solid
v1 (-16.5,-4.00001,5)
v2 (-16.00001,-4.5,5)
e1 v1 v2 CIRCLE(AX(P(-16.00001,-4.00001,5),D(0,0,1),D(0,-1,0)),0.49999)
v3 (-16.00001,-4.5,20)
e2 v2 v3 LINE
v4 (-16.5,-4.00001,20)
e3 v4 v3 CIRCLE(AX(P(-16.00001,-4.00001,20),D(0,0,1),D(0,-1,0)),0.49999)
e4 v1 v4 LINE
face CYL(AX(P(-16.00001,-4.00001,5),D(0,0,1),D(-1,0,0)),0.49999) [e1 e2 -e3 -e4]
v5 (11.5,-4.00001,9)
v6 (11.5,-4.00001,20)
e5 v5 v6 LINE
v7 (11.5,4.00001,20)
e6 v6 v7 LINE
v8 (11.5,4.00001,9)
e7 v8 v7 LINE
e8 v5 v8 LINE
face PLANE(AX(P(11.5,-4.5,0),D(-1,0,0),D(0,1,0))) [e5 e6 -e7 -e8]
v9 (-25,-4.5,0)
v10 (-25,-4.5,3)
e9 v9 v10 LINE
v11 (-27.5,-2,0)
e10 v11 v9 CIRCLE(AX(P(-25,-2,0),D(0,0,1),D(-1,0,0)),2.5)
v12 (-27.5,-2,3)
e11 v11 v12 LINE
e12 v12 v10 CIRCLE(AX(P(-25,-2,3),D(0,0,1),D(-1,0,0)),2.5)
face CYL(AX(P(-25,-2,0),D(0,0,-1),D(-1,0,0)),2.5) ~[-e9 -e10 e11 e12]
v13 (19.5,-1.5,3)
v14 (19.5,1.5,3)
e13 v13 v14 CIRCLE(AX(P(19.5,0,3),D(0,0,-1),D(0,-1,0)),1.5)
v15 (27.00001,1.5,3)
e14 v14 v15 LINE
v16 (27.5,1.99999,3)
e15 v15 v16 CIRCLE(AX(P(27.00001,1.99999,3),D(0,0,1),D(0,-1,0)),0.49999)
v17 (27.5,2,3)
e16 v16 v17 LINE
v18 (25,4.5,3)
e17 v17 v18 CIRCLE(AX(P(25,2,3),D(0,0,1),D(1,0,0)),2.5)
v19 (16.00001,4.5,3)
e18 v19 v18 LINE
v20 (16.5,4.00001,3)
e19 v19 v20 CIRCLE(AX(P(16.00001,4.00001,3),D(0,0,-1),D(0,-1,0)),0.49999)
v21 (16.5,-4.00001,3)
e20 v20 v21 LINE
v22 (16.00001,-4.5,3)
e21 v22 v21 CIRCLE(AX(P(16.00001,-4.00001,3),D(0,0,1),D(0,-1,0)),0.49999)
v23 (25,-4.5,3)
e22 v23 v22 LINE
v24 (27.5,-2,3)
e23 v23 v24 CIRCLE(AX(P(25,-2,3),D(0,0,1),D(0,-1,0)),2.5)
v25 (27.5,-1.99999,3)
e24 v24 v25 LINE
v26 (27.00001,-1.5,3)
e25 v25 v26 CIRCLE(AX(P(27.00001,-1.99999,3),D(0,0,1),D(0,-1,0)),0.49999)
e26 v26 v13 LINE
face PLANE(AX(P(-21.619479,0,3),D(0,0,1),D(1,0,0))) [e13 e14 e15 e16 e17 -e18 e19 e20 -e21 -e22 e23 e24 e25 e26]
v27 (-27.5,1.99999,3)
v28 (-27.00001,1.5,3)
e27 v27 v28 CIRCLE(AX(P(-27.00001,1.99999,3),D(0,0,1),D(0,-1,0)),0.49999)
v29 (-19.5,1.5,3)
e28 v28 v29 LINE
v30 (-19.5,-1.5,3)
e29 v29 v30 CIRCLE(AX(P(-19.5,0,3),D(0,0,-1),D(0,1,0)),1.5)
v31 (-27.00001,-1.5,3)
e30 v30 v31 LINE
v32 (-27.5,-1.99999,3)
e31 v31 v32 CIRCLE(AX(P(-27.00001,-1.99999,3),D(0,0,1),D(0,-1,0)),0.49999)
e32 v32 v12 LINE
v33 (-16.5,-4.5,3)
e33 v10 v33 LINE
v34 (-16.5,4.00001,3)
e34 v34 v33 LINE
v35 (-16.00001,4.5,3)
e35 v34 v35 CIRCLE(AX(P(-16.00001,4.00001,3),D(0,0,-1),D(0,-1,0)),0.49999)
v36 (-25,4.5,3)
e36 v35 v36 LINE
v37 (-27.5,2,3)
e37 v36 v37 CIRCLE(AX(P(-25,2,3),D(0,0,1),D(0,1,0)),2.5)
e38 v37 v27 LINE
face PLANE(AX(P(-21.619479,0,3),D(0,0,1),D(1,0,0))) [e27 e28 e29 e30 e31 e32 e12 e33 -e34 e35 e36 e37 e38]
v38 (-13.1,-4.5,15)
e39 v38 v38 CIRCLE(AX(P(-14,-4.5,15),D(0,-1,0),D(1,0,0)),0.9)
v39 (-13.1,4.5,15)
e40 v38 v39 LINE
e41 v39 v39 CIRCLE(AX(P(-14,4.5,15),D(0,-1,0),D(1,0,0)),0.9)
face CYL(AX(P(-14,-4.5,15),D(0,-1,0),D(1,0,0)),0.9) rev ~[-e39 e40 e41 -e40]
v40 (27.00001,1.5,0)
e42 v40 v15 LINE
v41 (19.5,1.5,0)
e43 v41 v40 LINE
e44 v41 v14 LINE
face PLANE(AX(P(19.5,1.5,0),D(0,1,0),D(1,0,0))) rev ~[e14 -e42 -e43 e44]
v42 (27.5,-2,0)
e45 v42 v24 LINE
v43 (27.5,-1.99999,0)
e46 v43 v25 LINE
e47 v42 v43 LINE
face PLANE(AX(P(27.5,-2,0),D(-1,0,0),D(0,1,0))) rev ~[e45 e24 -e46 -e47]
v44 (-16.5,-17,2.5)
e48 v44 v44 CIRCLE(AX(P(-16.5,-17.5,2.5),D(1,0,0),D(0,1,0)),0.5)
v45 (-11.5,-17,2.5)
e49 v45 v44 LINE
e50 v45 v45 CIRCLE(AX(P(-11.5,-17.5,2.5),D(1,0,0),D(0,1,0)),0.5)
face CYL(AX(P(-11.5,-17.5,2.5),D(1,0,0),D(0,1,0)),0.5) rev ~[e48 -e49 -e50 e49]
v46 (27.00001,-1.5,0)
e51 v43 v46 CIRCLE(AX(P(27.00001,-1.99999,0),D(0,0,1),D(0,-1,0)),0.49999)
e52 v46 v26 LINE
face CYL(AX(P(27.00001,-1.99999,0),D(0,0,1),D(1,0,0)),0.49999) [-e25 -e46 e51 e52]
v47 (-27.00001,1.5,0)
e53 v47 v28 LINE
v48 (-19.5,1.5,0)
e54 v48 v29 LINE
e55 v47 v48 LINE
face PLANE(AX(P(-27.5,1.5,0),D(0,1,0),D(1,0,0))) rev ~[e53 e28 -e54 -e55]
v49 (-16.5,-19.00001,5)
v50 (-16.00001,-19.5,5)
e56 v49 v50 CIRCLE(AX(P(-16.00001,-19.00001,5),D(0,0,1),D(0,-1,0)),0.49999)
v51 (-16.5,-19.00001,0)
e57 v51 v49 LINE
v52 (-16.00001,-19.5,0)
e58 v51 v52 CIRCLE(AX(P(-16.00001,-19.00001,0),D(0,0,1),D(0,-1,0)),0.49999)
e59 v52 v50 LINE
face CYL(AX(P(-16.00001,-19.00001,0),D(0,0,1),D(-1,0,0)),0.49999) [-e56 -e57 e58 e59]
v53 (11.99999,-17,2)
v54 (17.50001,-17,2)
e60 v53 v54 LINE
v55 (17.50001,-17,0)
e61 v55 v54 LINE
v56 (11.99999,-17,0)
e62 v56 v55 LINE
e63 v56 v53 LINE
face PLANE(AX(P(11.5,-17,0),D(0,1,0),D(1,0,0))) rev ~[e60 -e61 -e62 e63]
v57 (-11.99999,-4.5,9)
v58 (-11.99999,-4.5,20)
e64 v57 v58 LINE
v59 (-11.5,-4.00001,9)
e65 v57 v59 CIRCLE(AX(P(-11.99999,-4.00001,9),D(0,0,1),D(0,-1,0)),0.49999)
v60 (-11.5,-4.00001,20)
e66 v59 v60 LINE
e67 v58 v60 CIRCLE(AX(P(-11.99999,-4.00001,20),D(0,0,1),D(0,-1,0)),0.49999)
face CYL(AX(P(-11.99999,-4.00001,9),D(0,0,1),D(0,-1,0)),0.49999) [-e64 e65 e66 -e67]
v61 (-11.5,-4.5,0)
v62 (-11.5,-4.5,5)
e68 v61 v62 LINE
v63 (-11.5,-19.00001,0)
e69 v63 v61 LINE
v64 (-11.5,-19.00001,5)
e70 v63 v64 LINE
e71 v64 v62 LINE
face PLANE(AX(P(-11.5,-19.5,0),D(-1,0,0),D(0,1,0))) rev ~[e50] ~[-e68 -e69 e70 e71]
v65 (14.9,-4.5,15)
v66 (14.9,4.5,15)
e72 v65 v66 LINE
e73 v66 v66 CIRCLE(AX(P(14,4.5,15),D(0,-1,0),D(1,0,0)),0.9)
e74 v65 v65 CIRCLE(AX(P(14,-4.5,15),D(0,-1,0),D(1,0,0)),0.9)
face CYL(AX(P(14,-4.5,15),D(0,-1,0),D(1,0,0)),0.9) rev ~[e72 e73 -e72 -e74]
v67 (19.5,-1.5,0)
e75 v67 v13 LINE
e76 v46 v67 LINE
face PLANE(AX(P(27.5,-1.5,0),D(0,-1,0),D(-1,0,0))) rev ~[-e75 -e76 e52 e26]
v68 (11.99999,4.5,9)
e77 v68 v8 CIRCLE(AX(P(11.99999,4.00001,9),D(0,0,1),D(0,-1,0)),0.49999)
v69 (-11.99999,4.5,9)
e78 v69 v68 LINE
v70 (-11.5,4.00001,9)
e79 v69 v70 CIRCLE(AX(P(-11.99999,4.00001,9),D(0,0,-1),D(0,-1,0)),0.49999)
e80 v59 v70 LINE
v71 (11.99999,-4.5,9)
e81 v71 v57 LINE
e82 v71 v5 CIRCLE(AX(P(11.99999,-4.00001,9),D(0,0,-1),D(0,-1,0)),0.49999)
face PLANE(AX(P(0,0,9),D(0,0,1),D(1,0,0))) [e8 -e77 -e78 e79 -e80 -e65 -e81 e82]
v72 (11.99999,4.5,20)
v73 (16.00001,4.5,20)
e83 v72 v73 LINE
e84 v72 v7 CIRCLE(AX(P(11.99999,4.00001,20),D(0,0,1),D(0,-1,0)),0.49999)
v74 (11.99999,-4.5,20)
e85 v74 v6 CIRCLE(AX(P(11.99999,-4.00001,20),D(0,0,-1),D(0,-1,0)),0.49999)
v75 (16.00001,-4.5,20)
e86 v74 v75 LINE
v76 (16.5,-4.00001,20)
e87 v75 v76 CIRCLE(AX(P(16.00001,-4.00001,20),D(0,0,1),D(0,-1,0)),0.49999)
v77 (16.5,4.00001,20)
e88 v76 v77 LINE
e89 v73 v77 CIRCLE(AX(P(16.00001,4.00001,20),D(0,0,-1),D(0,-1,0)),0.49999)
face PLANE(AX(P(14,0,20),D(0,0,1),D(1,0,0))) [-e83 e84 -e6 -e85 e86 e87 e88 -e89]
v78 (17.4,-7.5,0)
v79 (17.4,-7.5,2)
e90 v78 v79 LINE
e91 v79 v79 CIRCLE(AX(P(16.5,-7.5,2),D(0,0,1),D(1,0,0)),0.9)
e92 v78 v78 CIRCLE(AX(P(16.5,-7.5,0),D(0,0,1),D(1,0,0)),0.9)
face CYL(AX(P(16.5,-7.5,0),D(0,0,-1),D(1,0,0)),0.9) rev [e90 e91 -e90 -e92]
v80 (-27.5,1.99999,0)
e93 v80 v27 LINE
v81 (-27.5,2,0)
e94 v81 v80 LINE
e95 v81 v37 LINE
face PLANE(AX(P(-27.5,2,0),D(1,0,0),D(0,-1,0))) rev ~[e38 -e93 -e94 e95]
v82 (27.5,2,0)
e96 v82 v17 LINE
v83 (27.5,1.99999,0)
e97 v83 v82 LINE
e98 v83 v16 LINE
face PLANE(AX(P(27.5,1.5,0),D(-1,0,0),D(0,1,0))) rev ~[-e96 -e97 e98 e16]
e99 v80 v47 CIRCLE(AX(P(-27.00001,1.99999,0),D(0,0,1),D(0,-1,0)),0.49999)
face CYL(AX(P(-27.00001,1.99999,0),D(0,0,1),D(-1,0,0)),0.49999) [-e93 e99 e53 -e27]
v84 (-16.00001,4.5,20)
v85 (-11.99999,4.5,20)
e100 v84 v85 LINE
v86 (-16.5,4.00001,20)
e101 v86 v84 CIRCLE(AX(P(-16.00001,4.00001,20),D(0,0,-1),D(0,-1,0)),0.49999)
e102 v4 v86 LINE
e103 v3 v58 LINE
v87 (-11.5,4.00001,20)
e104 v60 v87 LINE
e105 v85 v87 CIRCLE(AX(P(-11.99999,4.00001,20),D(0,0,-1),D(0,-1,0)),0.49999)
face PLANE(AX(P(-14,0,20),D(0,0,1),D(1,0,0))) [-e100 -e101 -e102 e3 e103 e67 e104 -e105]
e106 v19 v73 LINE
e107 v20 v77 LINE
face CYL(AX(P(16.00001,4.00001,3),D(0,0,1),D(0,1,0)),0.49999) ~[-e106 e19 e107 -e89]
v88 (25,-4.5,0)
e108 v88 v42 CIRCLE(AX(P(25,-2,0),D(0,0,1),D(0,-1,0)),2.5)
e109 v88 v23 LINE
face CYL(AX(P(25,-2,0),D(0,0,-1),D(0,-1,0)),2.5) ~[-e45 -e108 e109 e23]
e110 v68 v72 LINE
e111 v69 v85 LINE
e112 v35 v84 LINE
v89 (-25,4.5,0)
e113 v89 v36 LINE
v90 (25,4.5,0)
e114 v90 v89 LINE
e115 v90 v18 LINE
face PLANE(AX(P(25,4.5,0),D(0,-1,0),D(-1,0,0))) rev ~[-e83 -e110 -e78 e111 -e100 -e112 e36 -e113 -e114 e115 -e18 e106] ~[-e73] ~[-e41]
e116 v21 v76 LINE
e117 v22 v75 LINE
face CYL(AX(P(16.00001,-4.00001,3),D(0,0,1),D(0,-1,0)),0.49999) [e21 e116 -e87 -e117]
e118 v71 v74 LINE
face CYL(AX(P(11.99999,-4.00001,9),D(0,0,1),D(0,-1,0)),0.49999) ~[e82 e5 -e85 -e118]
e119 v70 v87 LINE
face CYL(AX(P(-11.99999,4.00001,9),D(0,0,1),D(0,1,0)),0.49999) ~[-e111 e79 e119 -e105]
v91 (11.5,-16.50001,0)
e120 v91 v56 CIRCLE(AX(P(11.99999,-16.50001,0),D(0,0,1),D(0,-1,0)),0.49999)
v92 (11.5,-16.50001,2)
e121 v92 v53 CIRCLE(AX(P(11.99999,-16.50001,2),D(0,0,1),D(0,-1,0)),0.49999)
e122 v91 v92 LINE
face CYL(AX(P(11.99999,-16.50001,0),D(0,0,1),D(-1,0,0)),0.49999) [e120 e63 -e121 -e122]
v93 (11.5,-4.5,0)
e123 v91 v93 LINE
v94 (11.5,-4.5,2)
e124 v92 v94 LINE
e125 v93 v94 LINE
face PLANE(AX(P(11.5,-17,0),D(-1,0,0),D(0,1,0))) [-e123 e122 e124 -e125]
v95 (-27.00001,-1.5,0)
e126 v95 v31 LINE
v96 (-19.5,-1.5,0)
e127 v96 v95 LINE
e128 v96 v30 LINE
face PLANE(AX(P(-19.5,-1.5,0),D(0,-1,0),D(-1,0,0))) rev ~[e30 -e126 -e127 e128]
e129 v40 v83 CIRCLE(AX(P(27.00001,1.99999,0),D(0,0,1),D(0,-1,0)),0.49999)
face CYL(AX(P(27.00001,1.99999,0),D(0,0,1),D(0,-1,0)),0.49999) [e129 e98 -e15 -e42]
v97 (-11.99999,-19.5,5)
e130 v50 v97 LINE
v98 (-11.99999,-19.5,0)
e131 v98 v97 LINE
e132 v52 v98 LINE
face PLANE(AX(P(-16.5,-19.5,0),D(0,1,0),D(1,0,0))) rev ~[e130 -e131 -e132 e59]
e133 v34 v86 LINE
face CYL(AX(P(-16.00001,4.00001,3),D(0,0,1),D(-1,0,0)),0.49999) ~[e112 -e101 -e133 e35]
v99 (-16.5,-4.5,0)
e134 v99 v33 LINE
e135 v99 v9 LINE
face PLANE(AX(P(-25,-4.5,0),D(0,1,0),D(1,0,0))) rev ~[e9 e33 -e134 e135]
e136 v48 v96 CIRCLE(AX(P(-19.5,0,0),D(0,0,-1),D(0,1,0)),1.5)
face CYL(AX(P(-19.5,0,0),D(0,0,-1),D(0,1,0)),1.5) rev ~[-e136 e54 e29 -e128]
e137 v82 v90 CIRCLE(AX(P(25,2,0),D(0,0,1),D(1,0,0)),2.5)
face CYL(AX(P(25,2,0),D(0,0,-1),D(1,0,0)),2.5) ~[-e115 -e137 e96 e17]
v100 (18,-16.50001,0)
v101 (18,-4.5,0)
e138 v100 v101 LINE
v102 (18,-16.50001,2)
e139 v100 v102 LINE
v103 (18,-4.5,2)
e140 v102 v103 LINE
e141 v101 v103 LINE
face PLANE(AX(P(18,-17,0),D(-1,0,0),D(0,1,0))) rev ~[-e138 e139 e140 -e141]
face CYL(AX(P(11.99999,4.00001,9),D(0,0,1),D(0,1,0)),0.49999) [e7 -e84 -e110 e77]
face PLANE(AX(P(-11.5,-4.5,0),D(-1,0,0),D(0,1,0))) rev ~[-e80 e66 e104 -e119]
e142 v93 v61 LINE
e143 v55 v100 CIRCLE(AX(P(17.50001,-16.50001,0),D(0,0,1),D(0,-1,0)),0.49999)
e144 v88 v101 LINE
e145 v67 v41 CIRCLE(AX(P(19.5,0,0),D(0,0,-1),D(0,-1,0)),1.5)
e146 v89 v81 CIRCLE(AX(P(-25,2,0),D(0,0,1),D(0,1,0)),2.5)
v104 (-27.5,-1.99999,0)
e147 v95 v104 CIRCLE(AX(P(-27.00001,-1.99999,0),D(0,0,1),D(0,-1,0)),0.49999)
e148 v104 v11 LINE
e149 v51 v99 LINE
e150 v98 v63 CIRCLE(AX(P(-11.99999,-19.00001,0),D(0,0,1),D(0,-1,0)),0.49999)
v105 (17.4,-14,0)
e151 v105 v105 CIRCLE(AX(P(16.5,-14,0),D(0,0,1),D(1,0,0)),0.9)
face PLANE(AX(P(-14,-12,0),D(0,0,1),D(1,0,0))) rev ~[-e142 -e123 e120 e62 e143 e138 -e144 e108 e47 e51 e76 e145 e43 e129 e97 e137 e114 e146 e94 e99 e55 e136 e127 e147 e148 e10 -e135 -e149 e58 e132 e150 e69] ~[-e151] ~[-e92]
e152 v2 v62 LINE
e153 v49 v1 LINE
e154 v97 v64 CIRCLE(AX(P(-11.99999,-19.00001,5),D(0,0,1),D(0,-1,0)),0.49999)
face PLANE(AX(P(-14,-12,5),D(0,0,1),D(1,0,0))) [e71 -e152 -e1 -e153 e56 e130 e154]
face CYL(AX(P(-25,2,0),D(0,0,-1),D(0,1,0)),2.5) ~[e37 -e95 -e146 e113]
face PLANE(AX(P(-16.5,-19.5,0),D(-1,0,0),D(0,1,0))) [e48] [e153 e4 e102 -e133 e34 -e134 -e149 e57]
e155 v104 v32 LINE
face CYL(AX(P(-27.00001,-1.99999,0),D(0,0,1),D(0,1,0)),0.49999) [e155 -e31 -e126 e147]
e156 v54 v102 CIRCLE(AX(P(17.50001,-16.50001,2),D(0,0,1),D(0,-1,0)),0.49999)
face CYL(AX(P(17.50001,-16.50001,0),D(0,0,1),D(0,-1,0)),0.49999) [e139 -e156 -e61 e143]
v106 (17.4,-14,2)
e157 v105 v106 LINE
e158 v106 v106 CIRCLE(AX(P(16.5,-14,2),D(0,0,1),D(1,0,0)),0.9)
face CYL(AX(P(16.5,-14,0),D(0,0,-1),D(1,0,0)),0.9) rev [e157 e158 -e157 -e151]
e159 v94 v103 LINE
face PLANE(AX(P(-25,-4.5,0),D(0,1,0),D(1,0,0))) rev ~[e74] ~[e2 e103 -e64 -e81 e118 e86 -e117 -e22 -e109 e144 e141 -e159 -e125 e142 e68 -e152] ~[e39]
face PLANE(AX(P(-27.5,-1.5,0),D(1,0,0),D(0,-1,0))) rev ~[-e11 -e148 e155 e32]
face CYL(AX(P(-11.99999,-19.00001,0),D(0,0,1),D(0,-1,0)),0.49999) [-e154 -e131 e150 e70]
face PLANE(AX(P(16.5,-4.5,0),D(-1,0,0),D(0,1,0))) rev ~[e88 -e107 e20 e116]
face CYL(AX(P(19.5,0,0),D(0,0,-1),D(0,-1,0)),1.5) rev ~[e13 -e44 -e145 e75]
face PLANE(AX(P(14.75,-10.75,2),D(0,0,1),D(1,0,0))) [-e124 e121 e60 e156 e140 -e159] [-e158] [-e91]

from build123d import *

# Parameters (mm, degrees)
F0_W      = 5
F0_H      = 9
F0_W_2    = 23
F1_DEPTH  = 3
F2_DEPTH  = 20
F3_DEPTH  = 9
F0_H_2    = 15
F4_DEPTH  = 5
F5_R      = 0.5
F6_DEPTH  = 25
F7_W      = 6.5
F7_H      = 12.5
F7_R      = 0.9
F8_DEPTH  = 2
F9_R      = 0.9
F10_DEPTH = 25
F11_R     = 0.49999


# Not quite as in the source:
# - a fillet or chamfer is up to 0.001 mm smaller than in the source, because OpenCascade refuses the exact size


with BuildPart() as f1:
    # F0 (on Top) → F1 (new body)
    with BuildSketch(Plane.XY):
        with BuildLine():
            Line((-16.5, 4.5), (-25, 4.5))
            ThreePointArc((-25, 4.5), (-26.767766953, 3.767766953), (-27.5, 2))
            Line((-27.5, 2), (-27.5, 1.5))
            Line((-27.5, 1.5), (-19.5, 1.5))
            ThreePointArc((-19.5, 1.5), (-18, 0), (-19.5, -1.5))
            Line((-19.5, -1.5), (-27.5, -1.5))
            Line((-27.5, -1.5), (-27.5, -2))
            ThreePointArc((-27.5, -2), (-26.767766953, -3.767766953), (-25, -4.5))
            Line((-25, -4.5), (-16.5, -4.5))
            Line((-16.5, -4.5), (-16.5, 4.5))
        make_face()
        with BuildLine():
            Line((25, 4.5), (16.5, 4.5))
            Line((16.5, 4.5), (16.5, -4.5))
            Line((16.5, -4.5), (25, -4.5))
            ThreePointArc((25, -4.5), (26.767766953, -3.767766953), (27.5, -2))
            Line((27.5, -2), (27.5, -1.5))
            Line((27.5, -1.5), (19.5, -1.5))
            ThreePointArc((19.5, -1.5), (18, 0), (19.5, 1.5))
            Line((19.5, 1.5), (27.5, 1.5))
            Line((27.5, 1.5), (27.5, 2))
            ThreePointArc((27.5, 2), (26.767766953, 3.767766953), (25, 4.5))
        make_face()
        with Locations((-14, 0)):
            Rectangle(F0_W, F0_H)
        with Locations((14, 0)):
            Rectangle(F0_W, F0_H)
        Rectangle(F0_W_2, F0_H)
    extrude(amount=F1_DEPTH)

    # F0 (on Top) → F2 (join)
    with BuildSketch(Plane.XY):
        with Locations((14, 0)):
            Rectangle(F0_W, F0_H)
        with Locations((-14, 0)):
            Rectangle(F0_W, F0_H)
    extrude(amount=F2_DEPTH)

    # F0 (on Top) → F3 (join)
    with BuildSketch(Plane.XY):
        Rectangle(F0_W_2, F0_H)
    extrude(amount=F3_DEPTH)

    # F0 (on Top) → F4 (join)
    with BuildSketch(Plane.XY):
        with Locations((-14, -12)):
            Rectangle(F0_W, F0_H_2)
    extrude(amount=F4_DEPTH)

    # F5 (on face) → F6 (cut)
    with BuildSketch(Plane.YZ.offset(-11.5)):
        with Locations((-17.5, 2.5)):
            Circle(F5_R)
    extrude(amount=-F6_DEPTH, mode=Mode.SUBTRACT)

    # F7 (on Top) → F8 (join)
    with BuildSketch(Plane.XY):
        with Locations((14.75, -10.75)):
            Rectangle(F7_W, F7_H)
        with Locations((16.5, -14)):
            Circle(F7_R, mode=Mode.SUBTRACT)
        with Locations((16.5, -7.5)):
            Circle(F7_R, mode=Mode.SUBTRACT)
    extrude(amount=F8_DEPTH)

    # F9 (on face) → F10 (cut)
    with BuildSketch(Plane.XZ.offset(4.5)):
        with Locations((-14, 15)):
            Circle(F9_R)
        with Locations((14, 15)):
            Circle(F9_R)
    extrude(amount=-F10_DEPTH, mode=Mode.SUBTRACT)

    # F11 (radius 0.5 in the source; OpenCascade refuses exactly that, so slightly less here)
    f11_edges = [f1.edges().sort_by_distance(p)[0] for p in [
        (11.5, -17, 1),
        (18, -17, 1),
        (-11.5, -19.5, 2.5),
        (-16.5, -19.5, 2.5),
        (-16.5, -4.5, 12.5),
        (11.5, -4.5, 14.5),
        (-11.5, -4.5, 14.5),
        (16.5, -4.5, 11.5),
        (11.5, 4.5, 14.5),
        (-11.5, 4.5, 14.5),
        (-16.5, 4.5, 11.5),
        (16.5, 4.5, 11.5),
        (-27.5, 1.5, 1.5),
        (-27.5, -1.5, 1.5),
        (27.5, 1.5, 1.5),
        (27.5, -1.5, 1.5),
    ]]
    fillet(f11_edges, radius=F11_R)


solid = f1.part
